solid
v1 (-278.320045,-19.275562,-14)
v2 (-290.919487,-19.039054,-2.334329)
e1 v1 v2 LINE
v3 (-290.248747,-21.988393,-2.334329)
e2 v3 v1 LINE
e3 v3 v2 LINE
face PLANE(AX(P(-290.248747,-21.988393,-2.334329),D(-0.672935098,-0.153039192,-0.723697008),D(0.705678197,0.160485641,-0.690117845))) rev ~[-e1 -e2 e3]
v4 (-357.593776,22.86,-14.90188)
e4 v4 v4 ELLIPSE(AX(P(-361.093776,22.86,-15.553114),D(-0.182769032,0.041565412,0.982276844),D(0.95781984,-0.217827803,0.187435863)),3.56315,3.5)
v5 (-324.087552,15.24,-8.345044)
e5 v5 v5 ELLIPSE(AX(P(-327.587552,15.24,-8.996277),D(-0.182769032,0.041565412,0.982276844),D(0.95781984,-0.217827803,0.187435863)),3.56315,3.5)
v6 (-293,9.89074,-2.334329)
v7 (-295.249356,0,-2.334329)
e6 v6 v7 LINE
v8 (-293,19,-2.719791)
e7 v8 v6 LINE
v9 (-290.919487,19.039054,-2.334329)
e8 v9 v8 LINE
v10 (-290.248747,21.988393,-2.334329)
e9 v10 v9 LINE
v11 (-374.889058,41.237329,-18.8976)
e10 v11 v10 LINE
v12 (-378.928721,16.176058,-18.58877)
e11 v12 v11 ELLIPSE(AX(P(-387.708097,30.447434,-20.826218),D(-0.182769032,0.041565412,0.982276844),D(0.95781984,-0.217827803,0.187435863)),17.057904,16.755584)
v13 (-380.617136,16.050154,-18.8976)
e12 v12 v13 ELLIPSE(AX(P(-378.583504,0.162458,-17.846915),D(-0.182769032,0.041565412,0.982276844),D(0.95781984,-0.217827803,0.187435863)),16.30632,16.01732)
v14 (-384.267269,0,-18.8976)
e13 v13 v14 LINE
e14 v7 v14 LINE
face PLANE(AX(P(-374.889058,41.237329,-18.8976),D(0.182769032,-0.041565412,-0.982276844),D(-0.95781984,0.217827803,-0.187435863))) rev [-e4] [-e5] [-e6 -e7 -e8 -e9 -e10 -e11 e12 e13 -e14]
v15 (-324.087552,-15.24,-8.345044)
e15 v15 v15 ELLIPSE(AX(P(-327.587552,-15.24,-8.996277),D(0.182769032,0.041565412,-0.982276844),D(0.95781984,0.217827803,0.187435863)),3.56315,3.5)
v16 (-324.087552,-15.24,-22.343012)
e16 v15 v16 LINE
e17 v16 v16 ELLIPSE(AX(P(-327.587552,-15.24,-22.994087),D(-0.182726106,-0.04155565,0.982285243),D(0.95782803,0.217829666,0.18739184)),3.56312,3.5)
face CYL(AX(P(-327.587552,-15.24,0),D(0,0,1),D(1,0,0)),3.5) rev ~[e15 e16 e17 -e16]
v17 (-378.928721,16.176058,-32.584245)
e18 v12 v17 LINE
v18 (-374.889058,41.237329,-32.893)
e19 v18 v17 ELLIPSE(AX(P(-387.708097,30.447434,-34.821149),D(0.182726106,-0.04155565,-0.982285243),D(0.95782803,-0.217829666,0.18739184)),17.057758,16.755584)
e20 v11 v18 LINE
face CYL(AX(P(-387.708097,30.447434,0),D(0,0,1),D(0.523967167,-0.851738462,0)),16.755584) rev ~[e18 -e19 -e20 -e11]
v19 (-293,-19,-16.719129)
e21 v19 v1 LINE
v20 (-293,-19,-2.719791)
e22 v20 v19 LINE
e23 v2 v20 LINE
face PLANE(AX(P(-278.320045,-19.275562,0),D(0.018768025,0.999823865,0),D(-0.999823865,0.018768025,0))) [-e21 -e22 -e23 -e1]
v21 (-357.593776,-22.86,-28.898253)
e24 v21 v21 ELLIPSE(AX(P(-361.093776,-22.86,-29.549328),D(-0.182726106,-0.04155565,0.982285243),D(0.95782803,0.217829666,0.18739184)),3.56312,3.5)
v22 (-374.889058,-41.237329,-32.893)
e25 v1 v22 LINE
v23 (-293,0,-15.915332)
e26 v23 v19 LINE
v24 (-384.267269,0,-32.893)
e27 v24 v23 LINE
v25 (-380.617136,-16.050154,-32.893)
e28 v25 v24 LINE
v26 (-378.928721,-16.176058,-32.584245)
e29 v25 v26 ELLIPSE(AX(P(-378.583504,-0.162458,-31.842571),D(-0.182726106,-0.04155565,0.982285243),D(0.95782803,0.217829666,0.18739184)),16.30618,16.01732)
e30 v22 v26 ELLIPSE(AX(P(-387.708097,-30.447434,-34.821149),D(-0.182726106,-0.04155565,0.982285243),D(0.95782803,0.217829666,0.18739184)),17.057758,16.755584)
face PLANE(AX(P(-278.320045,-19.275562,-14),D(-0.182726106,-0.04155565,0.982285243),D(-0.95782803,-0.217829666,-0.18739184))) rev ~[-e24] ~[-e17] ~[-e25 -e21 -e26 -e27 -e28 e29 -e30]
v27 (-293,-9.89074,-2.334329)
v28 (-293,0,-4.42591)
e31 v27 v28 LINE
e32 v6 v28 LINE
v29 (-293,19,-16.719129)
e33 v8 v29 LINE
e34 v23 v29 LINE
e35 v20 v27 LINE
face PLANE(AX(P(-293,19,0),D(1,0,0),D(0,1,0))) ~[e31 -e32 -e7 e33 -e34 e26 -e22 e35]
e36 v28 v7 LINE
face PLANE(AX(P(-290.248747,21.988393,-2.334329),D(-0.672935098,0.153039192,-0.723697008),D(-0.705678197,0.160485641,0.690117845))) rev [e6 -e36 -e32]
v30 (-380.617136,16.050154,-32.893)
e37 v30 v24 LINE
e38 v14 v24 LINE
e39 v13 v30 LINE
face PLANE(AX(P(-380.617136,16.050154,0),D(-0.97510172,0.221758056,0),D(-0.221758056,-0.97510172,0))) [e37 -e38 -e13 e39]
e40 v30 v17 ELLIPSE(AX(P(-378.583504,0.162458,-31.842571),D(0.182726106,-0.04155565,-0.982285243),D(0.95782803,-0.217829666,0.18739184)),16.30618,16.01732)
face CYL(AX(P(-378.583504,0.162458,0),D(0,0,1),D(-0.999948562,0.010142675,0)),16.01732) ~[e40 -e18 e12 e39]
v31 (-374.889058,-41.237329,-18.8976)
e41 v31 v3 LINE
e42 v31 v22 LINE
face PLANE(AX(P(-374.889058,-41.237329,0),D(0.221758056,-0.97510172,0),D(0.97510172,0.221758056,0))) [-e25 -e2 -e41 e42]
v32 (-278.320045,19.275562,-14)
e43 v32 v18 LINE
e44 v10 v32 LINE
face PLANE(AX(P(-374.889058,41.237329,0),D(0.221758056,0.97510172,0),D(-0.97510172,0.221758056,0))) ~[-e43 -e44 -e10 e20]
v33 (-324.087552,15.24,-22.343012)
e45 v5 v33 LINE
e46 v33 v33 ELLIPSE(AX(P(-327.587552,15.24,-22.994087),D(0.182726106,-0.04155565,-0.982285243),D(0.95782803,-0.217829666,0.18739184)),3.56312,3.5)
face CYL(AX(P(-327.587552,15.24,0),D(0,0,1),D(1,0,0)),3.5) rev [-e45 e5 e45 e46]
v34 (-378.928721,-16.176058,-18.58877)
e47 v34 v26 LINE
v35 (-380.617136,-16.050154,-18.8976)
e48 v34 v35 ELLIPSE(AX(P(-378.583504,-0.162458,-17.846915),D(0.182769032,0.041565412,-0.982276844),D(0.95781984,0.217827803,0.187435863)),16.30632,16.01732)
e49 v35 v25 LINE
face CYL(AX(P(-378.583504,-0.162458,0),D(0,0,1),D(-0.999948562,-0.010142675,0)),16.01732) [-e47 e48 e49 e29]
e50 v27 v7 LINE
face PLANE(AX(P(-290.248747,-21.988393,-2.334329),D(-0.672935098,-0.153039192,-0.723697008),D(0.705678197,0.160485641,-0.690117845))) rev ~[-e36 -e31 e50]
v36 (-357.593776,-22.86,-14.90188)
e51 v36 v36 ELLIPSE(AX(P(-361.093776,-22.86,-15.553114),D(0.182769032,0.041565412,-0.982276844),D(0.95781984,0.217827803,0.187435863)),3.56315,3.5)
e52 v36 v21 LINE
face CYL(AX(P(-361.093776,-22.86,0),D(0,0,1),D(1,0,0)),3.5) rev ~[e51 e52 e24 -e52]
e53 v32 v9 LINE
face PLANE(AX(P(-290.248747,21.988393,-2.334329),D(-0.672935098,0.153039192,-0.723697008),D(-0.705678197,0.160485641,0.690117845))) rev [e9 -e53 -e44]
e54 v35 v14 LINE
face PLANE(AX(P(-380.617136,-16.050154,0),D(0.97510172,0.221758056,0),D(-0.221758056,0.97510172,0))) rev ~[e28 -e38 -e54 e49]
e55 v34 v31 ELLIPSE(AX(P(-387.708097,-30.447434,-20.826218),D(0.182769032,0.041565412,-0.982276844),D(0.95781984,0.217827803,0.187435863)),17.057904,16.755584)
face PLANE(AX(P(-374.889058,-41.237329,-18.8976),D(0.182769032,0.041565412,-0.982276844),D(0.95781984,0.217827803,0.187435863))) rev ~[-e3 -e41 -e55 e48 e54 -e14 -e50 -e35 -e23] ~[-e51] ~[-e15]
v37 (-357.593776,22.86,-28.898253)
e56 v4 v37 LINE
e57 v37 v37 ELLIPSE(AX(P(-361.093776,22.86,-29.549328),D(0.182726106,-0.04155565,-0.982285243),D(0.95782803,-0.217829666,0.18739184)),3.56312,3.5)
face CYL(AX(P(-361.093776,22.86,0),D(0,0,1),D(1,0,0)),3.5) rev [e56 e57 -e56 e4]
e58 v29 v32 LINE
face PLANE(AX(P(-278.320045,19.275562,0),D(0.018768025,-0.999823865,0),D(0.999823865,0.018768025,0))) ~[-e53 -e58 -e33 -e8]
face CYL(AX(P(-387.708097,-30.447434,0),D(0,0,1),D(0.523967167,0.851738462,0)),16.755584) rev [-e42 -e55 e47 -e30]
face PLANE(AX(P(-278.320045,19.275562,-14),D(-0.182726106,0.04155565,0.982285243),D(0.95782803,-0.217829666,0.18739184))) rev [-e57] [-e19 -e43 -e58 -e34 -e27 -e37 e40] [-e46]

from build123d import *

# Parameters (mm, degrees)
F0_R     = 3.5
F1_DEPTH = 32.893
F3_DEPTH = 44.5826506487
F5_DEPTH = 32.894


# Not quite as in the source:
# - a feature names something its author has since deleted; it is built from what else it names


with BuildPart() as f1:
    # F0 (on Top) → F1 (new body)
    with BuildSketch(Plane.XY):
        with BuildLine():
            Line((-293, -19), (-293, 0))
            Line((-293, 0), (-394.6, 0))
            Line((-394.6, 0), (-394.6, -0.3249169361))
            ThreePointArc((-394.6, -0.3249169361), (-389.9738981677, -11.4236067086), (-378.9287209511, -16.1760579795))
            ThreePointArc((-378.9287209511, -16.1760579795), (-371.1660381492, -27.7809948386), (-374.8890577817, -41.2373289829))
            Line((-374.8890577817, -41.2373289829), (-278.3200451143, -19.2755622931))
            Line((-278.3200451143, -19.2755622931), (-293, -19))
        make_face()
        with Locations((-361.0937758916, -22.86)):
            Circle(F0_R, mode=Mode.SUBTRACT)
        with Locations((-327.5875517832, -15.24)):
            Circle(F0_R, mode=Mode.SUBTRACT)
    extrude(amount=-F1_DEPTH)

    # F2 (on face) → F3 (cut, through all)
    with BuildSketch(Plane(origin=(-9.5187600933, 41.855342378, 0), x_dir=(0.9751017202, 0.2217580556, 0), z_dir=(0.2217580556, -0.9751017202, 0))):
        Polygon((-275.6648659783, -32.893), (-275.6648659783, -14), (-374.6996750289, -32.893), align=None)
        Polygon((-374.6996750289, -18.8976), (-287.8981553787, -2.3343288283), (-275.6648659783, -14), (-275.6648659783, 0), (-374.6996750289, 0), align=None)
    extrude(amount=-F3_DEPTH, mode=Mode.SUBTRACT)

    # F4: F1 across plane


with BuildPart() as f1_1:
    add(f1.part)
    add(f1.part.mirror(Plane.XZ))

    # F5 (cut, through all): a face of the model
    f5_faces = [f1_1.faces().sort_by_distance(p)[0] for p in [
        (-387.4719249036, 0, 0),
    ]]
    extrude(f5_faces, amount=-F5_DEPTH, mode=Mode.SUBTRACT)


solid = f1_1.part
